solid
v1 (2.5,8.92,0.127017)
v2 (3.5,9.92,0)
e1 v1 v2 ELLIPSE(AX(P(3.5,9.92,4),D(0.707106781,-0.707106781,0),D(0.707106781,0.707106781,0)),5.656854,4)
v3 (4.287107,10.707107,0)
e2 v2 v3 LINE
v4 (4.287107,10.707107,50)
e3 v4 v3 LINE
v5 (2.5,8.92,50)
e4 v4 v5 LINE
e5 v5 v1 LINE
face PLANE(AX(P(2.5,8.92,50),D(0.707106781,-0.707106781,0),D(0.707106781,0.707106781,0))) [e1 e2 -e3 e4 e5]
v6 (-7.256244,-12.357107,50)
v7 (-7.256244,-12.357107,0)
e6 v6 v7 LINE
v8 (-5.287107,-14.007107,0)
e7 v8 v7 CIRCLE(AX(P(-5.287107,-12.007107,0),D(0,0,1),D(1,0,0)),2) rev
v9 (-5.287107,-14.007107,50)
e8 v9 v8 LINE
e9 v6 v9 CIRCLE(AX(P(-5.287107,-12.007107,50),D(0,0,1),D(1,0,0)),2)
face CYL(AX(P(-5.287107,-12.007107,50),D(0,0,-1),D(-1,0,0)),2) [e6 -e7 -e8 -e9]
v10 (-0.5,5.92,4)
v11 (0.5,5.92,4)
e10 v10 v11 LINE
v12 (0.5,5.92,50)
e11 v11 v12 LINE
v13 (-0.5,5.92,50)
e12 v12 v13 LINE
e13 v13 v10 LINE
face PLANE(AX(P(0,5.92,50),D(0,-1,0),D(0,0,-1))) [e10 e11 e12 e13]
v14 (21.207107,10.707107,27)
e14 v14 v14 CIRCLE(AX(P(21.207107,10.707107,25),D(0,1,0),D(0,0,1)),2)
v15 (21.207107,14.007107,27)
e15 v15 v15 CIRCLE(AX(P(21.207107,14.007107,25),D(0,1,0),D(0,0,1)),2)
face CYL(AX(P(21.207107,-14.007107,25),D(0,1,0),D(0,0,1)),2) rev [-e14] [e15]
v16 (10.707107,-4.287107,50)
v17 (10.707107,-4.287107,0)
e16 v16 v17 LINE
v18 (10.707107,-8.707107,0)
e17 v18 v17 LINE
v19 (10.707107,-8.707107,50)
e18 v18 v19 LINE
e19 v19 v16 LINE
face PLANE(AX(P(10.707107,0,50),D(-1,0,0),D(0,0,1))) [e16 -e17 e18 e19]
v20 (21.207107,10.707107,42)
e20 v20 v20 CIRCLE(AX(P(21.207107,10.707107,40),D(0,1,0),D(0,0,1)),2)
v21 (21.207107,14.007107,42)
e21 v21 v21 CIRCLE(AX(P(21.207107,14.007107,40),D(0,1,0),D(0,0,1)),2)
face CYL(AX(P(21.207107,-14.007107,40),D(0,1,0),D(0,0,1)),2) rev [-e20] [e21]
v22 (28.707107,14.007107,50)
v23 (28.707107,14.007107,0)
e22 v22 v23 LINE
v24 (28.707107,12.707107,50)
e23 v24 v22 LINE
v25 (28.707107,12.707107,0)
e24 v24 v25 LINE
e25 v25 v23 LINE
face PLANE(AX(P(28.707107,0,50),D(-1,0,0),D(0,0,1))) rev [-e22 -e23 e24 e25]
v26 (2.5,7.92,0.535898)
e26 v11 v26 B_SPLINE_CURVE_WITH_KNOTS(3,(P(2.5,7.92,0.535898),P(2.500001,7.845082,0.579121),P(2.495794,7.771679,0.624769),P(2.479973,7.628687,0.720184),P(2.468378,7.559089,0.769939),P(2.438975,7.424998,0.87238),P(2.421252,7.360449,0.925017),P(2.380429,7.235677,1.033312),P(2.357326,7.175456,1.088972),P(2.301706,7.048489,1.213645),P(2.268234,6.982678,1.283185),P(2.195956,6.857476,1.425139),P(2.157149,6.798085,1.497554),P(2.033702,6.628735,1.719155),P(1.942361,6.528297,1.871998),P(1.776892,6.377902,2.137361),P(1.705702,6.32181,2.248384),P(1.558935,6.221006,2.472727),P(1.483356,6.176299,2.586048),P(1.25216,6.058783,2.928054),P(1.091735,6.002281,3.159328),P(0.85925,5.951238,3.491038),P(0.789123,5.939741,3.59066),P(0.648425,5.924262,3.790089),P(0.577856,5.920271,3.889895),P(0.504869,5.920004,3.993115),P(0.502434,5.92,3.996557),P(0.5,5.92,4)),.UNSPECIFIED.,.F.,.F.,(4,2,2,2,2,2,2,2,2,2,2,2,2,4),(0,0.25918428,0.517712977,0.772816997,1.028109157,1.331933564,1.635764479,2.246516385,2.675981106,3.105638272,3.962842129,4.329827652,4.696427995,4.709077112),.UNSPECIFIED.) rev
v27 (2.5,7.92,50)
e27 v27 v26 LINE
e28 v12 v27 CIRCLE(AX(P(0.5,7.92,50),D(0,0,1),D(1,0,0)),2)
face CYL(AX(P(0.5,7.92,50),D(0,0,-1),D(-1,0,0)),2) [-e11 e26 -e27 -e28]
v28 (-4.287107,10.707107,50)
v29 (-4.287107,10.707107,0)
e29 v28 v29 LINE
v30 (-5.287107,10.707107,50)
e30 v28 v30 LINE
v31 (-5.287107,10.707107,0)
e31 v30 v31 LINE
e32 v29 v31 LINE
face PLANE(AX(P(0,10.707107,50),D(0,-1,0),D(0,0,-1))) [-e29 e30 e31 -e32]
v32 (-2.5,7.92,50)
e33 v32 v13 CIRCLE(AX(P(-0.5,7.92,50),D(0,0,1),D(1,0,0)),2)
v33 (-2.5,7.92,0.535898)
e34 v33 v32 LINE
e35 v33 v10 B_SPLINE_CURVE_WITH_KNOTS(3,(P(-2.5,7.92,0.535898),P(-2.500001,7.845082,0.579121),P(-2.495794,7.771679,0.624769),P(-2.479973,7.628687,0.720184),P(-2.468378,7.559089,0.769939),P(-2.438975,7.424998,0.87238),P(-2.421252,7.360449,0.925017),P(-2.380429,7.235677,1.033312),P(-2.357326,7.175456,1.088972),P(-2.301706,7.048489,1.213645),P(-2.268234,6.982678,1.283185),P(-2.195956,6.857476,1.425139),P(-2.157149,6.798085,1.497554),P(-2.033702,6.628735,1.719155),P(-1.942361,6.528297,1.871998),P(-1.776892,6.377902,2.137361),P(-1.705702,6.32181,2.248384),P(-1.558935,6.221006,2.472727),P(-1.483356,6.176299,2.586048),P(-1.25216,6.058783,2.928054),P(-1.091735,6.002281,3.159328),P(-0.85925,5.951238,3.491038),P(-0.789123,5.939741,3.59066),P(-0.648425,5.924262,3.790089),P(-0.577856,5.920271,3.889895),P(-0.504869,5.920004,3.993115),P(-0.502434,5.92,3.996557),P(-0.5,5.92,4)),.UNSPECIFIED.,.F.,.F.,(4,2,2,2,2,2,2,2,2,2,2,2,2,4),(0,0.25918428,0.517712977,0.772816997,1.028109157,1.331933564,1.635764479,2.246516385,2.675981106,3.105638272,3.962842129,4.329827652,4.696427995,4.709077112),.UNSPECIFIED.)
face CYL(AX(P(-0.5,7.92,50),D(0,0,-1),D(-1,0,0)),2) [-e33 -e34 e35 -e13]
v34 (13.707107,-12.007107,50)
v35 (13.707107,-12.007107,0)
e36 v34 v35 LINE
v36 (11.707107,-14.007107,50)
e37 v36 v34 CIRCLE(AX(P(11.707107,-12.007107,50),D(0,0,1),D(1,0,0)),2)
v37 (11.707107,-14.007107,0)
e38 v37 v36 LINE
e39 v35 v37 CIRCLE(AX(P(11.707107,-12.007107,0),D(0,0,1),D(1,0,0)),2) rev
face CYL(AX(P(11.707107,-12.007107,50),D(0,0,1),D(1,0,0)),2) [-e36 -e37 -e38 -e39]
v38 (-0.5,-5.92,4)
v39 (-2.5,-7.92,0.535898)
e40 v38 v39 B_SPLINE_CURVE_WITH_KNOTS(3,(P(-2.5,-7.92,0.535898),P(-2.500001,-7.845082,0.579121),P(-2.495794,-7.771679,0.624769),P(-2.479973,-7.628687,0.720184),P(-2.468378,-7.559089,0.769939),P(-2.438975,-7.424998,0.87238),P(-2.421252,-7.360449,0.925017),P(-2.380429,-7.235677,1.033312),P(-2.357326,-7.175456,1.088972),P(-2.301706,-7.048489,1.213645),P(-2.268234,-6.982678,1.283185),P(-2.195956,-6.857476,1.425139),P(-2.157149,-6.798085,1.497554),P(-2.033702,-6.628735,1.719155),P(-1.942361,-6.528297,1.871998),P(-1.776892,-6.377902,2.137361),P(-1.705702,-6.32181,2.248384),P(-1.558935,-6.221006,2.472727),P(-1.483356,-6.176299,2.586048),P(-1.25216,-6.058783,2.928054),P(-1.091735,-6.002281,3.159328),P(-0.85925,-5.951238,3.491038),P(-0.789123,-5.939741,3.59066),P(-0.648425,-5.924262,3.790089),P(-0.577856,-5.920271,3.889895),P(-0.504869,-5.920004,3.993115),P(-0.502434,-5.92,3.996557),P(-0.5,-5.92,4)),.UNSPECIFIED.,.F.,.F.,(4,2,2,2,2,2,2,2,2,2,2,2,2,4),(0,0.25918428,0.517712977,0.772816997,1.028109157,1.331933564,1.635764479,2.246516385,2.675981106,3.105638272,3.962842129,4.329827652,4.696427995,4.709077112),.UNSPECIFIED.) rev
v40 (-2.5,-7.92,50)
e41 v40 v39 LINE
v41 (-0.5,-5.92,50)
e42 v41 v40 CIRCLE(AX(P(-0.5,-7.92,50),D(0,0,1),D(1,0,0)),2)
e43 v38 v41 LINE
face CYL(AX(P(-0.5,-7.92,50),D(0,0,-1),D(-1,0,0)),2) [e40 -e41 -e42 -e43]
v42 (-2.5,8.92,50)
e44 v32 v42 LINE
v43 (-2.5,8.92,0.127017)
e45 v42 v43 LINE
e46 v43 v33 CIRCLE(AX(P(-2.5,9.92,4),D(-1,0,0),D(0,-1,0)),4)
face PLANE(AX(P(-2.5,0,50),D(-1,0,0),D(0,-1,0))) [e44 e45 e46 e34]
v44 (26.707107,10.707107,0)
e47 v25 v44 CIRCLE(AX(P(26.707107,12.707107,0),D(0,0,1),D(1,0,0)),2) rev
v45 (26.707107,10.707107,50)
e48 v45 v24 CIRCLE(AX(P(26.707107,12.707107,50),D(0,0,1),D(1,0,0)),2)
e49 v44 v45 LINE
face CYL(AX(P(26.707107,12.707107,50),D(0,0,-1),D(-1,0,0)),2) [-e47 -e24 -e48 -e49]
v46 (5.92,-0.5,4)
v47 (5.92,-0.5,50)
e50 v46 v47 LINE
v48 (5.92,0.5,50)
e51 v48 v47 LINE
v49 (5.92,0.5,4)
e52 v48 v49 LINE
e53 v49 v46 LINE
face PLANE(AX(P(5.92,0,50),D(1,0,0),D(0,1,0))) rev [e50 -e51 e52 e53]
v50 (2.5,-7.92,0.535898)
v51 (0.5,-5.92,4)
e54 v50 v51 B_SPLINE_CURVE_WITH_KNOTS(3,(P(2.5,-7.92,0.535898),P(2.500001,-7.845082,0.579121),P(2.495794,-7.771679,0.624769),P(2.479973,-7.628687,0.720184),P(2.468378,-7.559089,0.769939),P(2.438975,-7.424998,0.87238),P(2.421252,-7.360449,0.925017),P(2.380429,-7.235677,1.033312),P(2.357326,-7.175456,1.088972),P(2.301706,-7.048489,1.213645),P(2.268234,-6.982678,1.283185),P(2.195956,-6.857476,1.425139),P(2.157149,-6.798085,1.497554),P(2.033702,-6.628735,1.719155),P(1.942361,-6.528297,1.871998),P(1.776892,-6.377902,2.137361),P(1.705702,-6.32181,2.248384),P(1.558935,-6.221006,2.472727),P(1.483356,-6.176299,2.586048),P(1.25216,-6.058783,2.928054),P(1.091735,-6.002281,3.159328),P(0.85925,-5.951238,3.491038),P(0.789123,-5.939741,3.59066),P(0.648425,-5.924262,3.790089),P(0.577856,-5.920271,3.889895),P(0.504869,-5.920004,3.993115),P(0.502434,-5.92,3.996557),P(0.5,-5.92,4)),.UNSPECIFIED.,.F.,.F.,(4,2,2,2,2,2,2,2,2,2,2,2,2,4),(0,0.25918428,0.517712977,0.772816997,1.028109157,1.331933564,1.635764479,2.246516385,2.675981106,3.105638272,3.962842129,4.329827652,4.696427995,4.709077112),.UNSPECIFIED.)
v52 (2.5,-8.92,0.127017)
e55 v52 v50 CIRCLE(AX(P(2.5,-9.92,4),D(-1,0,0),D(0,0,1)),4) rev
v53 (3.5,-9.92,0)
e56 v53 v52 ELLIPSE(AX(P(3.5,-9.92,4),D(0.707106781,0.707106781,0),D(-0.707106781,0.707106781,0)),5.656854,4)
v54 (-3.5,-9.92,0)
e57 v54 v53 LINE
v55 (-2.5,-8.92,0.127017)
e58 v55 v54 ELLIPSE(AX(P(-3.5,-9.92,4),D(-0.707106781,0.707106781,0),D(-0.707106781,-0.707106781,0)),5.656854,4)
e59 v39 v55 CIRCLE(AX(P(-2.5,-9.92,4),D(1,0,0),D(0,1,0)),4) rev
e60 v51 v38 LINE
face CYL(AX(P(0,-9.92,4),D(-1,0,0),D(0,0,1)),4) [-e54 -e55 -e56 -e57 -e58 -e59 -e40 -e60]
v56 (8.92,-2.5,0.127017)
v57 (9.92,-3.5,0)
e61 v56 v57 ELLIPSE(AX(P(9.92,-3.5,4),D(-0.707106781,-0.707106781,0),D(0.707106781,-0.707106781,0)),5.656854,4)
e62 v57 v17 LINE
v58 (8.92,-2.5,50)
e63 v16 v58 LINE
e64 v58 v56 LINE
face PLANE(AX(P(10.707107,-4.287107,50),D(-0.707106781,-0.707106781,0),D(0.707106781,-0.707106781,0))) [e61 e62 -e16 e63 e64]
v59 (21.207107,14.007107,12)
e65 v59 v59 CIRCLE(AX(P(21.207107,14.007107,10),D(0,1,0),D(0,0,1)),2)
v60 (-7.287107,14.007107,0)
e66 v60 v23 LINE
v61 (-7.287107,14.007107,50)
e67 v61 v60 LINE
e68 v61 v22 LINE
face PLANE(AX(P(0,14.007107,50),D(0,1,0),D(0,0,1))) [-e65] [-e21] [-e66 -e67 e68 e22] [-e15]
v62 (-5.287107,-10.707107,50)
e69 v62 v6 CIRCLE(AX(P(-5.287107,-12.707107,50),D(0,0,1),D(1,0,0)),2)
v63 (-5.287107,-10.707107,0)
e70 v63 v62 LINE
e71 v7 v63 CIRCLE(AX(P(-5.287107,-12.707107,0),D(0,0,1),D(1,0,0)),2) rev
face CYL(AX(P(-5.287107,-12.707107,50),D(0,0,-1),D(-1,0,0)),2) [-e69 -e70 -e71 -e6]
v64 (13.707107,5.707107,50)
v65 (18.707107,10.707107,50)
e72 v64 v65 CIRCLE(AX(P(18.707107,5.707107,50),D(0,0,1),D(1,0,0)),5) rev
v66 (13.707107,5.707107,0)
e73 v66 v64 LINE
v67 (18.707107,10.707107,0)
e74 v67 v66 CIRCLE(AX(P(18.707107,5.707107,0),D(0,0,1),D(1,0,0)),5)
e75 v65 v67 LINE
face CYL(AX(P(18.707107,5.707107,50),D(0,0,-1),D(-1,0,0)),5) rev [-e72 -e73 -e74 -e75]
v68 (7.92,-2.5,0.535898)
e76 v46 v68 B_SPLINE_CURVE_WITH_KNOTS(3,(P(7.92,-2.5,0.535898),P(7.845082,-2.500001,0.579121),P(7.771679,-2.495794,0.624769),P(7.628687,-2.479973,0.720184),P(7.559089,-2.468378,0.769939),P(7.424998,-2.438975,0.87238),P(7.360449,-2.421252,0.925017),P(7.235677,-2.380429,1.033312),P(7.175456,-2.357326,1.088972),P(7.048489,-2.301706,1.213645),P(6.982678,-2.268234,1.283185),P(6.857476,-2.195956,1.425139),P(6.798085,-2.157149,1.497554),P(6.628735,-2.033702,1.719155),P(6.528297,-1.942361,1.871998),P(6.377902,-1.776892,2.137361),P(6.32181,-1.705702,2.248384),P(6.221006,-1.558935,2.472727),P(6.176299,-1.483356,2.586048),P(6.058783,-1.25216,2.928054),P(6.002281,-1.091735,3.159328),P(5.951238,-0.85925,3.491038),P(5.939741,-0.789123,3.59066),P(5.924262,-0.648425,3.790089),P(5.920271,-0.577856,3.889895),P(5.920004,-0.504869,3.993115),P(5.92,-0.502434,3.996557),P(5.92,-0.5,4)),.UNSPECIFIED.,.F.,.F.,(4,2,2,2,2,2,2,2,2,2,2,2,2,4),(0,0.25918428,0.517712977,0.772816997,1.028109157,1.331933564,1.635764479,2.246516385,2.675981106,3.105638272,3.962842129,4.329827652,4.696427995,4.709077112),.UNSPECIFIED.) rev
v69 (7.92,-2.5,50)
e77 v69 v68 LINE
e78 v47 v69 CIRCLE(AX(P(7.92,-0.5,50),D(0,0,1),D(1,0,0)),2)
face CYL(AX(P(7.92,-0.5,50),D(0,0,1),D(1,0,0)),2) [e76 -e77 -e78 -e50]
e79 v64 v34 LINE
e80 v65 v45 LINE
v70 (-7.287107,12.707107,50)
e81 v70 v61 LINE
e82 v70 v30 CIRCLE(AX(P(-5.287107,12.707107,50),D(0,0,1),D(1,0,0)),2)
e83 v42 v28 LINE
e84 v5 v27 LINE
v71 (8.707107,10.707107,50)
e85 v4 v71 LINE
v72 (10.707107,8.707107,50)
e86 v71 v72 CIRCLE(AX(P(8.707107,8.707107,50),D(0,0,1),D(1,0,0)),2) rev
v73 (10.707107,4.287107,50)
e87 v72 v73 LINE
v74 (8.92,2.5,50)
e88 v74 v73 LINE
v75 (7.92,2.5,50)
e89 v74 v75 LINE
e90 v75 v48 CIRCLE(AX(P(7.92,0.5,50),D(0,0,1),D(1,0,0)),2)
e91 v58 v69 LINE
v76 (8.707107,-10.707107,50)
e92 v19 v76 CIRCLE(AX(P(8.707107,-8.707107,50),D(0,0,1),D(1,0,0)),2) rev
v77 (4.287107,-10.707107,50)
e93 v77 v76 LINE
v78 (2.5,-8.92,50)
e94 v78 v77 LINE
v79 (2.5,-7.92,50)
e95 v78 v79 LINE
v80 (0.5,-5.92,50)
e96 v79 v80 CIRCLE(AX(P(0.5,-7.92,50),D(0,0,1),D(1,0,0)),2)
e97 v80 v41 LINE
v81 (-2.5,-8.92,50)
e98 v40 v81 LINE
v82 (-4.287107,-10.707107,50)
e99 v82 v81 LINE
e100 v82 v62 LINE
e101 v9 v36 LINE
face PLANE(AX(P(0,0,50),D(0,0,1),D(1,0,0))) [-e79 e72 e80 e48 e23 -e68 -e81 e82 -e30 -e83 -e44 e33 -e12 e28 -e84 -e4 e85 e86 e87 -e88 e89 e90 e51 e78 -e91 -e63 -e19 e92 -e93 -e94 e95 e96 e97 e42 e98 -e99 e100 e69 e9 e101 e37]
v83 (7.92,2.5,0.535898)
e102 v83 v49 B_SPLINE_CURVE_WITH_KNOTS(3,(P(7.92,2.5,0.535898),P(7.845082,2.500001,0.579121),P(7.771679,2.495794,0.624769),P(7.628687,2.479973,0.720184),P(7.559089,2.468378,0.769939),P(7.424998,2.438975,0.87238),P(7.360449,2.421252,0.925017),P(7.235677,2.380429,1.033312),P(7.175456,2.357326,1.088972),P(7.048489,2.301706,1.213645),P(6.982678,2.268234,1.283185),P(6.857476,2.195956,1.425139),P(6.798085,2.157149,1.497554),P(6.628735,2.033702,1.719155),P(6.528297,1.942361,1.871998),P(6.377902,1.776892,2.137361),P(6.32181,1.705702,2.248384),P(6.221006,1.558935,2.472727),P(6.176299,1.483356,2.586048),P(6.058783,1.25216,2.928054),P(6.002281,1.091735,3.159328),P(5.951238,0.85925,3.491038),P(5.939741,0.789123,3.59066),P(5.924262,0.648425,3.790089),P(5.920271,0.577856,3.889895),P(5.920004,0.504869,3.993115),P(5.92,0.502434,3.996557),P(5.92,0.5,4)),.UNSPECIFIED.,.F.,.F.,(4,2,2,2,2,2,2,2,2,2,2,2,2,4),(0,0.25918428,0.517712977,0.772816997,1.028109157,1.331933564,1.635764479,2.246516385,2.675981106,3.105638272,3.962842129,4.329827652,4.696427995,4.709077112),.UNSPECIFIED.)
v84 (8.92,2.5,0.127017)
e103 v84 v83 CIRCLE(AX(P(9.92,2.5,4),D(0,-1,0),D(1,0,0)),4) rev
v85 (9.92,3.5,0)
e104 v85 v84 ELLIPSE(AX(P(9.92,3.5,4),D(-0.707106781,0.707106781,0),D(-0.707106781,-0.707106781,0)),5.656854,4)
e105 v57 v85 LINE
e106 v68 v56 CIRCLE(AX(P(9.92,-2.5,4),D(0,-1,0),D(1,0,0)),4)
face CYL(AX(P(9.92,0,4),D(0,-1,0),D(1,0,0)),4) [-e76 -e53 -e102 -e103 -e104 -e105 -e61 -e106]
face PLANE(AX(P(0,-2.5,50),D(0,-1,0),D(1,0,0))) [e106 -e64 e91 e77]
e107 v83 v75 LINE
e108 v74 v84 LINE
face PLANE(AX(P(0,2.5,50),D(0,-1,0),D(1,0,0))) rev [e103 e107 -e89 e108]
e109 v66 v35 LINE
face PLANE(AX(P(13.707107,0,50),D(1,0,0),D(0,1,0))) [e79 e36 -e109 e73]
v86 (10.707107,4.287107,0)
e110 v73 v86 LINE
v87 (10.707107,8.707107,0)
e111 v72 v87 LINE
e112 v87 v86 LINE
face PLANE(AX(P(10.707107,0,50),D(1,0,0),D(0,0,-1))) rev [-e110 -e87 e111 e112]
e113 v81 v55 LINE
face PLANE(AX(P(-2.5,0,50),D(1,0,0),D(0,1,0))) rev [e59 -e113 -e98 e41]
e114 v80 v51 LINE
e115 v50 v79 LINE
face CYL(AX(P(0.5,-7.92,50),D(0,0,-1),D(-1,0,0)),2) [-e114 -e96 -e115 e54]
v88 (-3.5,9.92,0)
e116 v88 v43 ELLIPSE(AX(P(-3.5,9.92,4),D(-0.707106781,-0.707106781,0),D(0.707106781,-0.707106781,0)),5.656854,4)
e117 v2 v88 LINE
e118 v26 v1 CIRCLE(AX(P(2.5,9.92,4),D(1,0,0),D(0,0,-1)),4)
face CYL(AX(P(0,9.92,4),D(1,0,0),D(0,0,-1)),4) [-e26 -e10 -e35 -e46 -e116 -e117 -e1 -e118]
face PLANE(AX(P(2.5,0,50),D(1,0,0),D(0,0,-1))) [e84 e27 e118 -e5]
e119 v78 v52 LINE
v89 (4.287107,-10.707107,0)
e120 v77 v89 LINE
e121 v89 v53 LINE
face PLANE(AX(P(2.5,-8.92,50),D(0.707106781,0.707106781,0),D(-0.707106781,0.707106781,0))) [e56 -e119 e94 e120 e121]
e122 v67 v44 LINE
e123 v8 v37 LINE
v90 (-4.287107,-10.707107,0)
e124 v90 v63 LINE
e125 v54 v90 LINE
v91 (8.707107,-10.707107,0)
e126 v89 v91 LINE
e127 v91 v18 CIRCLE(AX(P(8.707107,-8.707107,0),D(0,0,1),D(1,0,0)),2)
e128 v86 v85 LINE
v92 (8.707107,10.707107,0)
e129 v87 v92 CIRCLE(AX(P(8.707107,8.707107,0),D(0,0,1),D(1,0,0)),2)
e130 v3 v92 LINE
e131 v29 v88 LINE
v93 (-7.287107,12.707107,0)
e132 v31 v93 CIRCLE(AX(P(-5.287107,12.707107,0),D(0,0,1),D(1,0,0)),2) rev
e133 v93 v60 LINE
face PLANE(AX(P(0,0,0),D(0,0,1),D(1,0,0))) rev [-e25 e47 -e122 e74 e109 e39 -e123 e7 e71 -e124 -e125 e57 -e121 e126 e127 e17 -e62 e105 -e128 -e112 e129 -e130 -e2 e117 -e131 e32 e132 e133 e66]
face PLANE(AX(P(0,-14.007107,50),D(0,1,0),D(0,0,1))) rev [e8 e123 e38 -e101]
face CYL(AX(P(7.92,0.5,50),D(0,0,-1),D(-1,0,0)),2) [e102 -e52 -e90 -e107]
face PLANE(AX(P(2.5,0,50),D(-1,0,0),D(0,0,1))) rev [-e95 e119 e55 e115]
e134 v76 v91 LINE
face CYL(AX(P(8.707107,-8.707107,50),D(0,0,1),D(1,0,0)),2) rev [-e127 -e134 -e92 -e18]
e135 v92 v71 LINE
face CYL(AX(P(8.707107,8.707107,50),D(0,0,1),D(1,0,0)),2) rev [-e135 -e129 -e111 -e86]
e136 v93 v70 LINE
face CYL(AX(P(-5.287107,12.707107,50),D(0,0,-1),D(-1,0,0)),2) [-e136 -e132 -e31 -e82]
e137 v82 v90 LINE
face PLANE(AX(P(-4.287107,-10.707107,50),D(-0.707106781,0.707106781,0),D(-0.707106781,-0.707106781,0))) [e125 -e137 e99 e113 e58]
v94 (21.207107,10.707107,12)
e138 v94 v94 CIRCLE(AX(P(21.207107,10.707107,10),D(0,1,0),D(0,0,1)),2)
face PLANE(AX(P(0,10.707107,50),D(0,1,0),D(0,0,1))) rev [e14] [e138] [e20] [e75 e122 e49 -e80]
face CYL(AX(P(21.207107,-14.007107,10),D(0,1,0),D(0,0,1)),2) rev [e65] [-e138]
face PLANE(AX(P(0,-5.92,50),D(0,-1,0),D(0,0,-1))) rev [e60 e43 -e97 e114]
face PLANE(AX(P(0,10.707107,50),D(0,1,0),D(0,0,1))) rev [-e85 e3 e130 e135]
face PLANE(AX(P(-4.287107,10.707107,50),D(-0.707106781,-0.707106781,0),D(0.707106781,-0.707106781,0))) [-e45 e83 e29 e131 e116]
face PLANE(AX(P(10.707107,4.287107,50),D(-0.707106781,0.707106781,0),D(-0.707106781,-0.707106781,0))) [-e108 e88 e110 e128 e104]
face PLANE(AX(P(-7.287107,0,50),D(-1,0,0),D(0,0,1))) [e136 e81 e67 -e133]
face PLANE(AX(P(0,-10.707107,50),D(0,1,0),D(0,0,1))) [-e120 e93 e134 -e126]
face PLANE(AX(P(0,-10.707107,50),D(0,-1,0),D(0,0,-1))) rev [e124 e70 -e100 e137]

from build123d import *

# Parameters (mm, degrees)
BOSS_EXTRUDE1_DEPTH     = 50
CUT_EXTRUDE1_DEPTH      = 60.332090981
SKETCH3_W               = 15
SKETCH3_H               = 3.3
CUT_EXTRUDE2_DEPTH      = 60.332090981
CUT_EXTRUDE4_DEPTH      = 60.332090981
CUT_EXTRUDE4_DEPTH_BACK = 10
FILLET1_R               = 2
FILLET2_R               = 5
CUT_EXTRUDE5_DEPTH      = 60.332090981
CUT_EXTRUDE5_DEPTH_BACK = 60.332090981
SKETCH7_R               = 2
FILLET3_R               = 4


with BuildPart() as part:
    # Sketch1 → Boss-Extrude1 (new body)
    with BuildSketch(Plane.XY):
        Polygon((2.5, 7.92), (4.58, 10), (5.287106781, 10.707106781), (10.707106781, 10.707106781), (10.707106781, 5.287106781), (10, 4.58), (7.92, 2.5), (5.92, 2.5), (5.92, -2.5), (7.92, -2.5), (10, -4.58), (10.707106781, -5.287106781), (10.707106781, -7.287106781), (13.707106781, -7.287106781), (13.707106781, 10.707106781), (28.707106781, 10.707106781), (28.707106781, 14.007106781), (13.707106781, 14.007106781), (-7.287106781, 14.007106781), (-7.287106781, 10.707106781), (-5.287106781, 10.707106781), (-4.58, 10), (-2.5, 7.92), (-2.5, 5.92), (2.5, 5.92), align=None)
    boss_extrude1 = extrude(amount=BOSS_EXTRUDE1_DEPTH)

    # Sketch2 → Cut-Extrude1 (cut, through all)
    with BuildSketch(Plane.XY):
        Polygon((0, 0), (18.478629357, 0), (18.478629357, -9.938314006), (0, -9.42769987), align=None)
    extrude(amount=CUT_EXTRUDE1_DEPTH, mode=Mode.SUBTRACT)

    # Mirror1: Boss-Extrude1 across plane
    add(boss_extrude1.mirror(Plane.ZX))

    # Sketch3 → Cut-Extrude2 (cut, through all)
    with BuildSketch(Plane.XY):
        with Locations((21.207106781, -12.357106781)):
            Rectangle(SKETCH3_W, SKETCH3_H)
    extrude(amount=CUT_EXTRUDE2_DEPTH, mode=Mode.SUBTRACT)

    # Sketch6 → Cut-Extrude4 (cut, two sides: drawn at the far end of the back side and taken through both)
    with BuildSketch(Plane.XY.offset(-CUT_EXTRUDE4_DEPTH_BACK)):
        Polygon((-5.287106781, 10.707106781), (-4.287106781, 10.707106781), (-2.5, 8.92), (-2.5, 7.92), align=None)
        Polygon((2.5, 7.92), (2.5, 8.92), (4.287106781, 10.707106781), (5.287106781, 10.707106781), align=None)
        Polygon((7.92, 2.5), (8.92, 2.5), (10.707106781, 4.287106781), (10.707106781, 5.287106781), align=None)
        Polygon((7.92, -2.5), (10.707106781, -5.287106781), (10.707106781, -4.287106781), (8.92, -2.5), align=None)
        Polygon((2.5, -7.92), (5.287106781, -10.707106781), (4.287106781, -10.707106781), (2.5, -8.92), align=None)
        Polygon((-5.287106781, -10.707106781), (-2.5, -7.92), (-2.5, -8.92), (-4.287106781, -10.707106781), align=None)
    extrude(amount=CUT_EXTRUDE4_DEPTH + CUT_EXTRUDE4_DEPTH_BACK, mode=Mode.SUBTRACT)

    # Fillet1
    # the kernel refuses this fillet: 2 mm, written as the material it adds along each edge
    with BuildSketch(Plane(origin=(10.707106781, 10.707106781, 0), x_dir=(0, -1, 0), z_dir=(0, 0, 1)), Plane(origin=(10.707106781, -10.707106781, 0), x_dir=(-1, 0, 0), z_dir=(0, 0, 1))) as fillet1_piece_1:
        with BuildLine():
            CenterArc((FILLET1_R, -FILLET1_R), FILLET1_R, 90, 90)
            Line((0, -FILLET1_R), (0, 0))
            Line((0, 0), (FILLET1_R, 0))
        make_face()
    extrude(amount=50)
    # the kernel refuses this fillet: 2 mm, written as the material it takes off along each edge
    with BuildSketch(Plane(origin=(13.707106781, -14.007106781, -5), x_dir=(-1, 0, 0), z_dir=(0, 0, 1)), Plane(origin=(5.92, 2.5, -5), x_dir=(1, 0, 0), z_dir=(0, 0, 1)), Plane(origin=(2.5, 5.92, -5), x_dir=(-1, 0, 0), z_dir=(0, 0, 1)), Plane(origin=(-2.5, 5.92, -5), x_dir=(0, 1, 0), z_dir=(0, 0, 1)), Plane(origin=(-7.287106781, 10.707106781, -5), x_dir=(0, 1, 0), z_dir=(0, 0, 1)), Plane(origin=(28.707106781, 10.707106781, -5), x_dir=(-1, 0, 0), z_dir=(0, 0, 1)), Plane(origin=(5.92, -2.5, -5), x_dir=(0, 1, 0), z_dir=(0, 0, 1)), Plane(origin=(2.5, -5.92, -5), x_dir=(0, -1, 0), z_dir=(0, 0, 1)), Plane(origin=(-2.5, -5.92, -5), x_dir=(1, 0, 0), z_dir=(0, 0, 1)), Plane(origin=(-7.287106781, -10.707106781, -5), x_dir=(1, 0, 0), z_dir=(0, 0, 1)), Plane(origin=(-7.287106781, -14.007106781, -5), x_dir=(0, 1, 0), z_dir=(0, 0, 1))) as fillet1_2_piece_1:
        with BuildLine():
            CenterArc((FILLET1_R, -FILLET1_R), FILLET1_R, 90, 90)
            Line((0, -FILLET1_R), (0, 0))
            Line((0, 0), (FILLET1_R, 0))
        make_face()
    extrude(amount=60, mode=Mode.SUBTRACT)

    # Fillet2
    fillet2_edges = [part.edges().sort_by_distance(p)[0] for p in [
        (13.707106781, 10.707106781, 25),
    ]]
    fillet(fillet2_edges, radius=FILLET2_R)

    # Sketch7 → Cut-Extrude5 (cut, two sides: drawn at the far end of the back side and taken through both)
    with BuildSketch(Plane(origin=(0, 0, 0), x_dir=(1, 0, 0), z_dir=(0, 1, 0)).offset(-CUT_EXTRUDE5_DEPTH_BACK)):
        with Locations(Location((21.207106781, -40, 0), (0, 0, 270))):
            Circle(SKETCH7_R)
        with Locations(Location((21.207106781, -25, 0), (0, 0, 270))):
            Circle(SKETCH7_R)
        with Locations(Location((21.207106781, -10, 0), (0, 0, 270))):
            Circle(SKETCH7_R)
    extrude(amount=CUT_EXTRUDE5_DEPTH + CUT_EXTRUDE5_DEPTH_BACK, mode=Mode.SUBTRACT)

    # Fillet3
    # the kernel refuses this fillet: 4 mm, written as the material it takes off along each edge
    with BuildSketch(Plane(origin=(-10.5, -5.92, 0), x_dir=(0, -1, 0), z_dir=(1, 0, 0))) as fillet3_piece_1_section:
        with BuildLine():
            CenterArc((FILLET3_R, -FILLET3_R), FILLET3_R, 90, 90)
            Line((0, -FILLET3_R), (0, 0))
            Line((0, 0), (FILLET3_R, 0))
        make_face()
    fillet3_piece_1 = extrude(amount=21, mode=Mode.PRIVATE)
    fillet3_piece_1 = split(fillet3_piece_1, bisect_by=Plane(origin=(2.5, -6.766631822, 0.880672942), z_dir=(-1, 0, 0)), keep=Keep.TOP, mode=Mode.PRIVATE)
    add(fillet3_piece_1, mode=Mode.SUBTRACT)
    with BuildSketch(Plane(origin=(-10.5, -5.92, 0), x_dir=(0, -1, 0), z_dir=(1, 0, 0))) as fillet3_piece_2_section:
        with BuildLine():
            CenterArc((FILLET3_R, -FILLET3_R), FILLET3_R, 90, 90)
            Line((0, -FILLET3_R), (0, 0))
            Line((0, 0), (FILLET3_R, 0))
        make_face()
    fillet3_piece_2 = extrude(amount=21, mode=Mode.PRIVATE)
    fillet3_piece_2 = split(fillet3_piece_2, bisect_by=Plane(origin=(2.799453379, -9.219453379, 0.025268376), z_dir=(-0.7071067811865467, -0.7071067811865485, 0)), keep=Keep.TOP, mode=Mode.PRIVATE)
    add(fillet3_piece_2, mode=Mode.SUBTRACT)
    with BuildSketch(Plane(origin=(5.92, -10.5, 0), x_dir=(1, 0, 0), z_dir=(0, 1, 0))) as fillet3_piece_3_section:
        with BuildLine():
            CenterArc((FILLET3_R, -FILLET3_R), FILLET3_R, 90, 90)
            Line((0, -FILLET3_R), (0, 0))
            Line((0, 0), (FILLET3_R, 0))
        make_face()
    fillet3_piece_3 = extrude(amount=21, mode=Mode.PRIVATE)
    fillet3_piece_3 = split(fillet3_piece_3, bisect_by=Plane(origin=(6.766631909, -2.5, 0.880672877), z_dir=(0, 1, 0)), keep=Keep.TOP, mode=Mode.PRIVATE)
    fillet3_piece_3 = split(fillet3_piece_3, bisect_by=Plane(origin=(6.766631909, 2.5, 0.880672877), z_dir=(0, -1, 0)), keep=Keep.TOP, mode=Mode.PRIVATE)
    add(fillet3_piece_3, mode=Mode.SUBTRACT)
    with BuildSketch(Plane(origin=(5.92, -10.5, 0), x_dir=(1, 0, 0), z_dir=(0, 1, 0))) as fillet3_piece_4_section:
        with BuildLine():
            CenterArc((FILLET3_R, -FILLET3_R), FILLET3_R, 90, 90)
            Line((0, -FILLET3_R), (0, 0))
            Line((0, 0), (FILLET3_R, 0))
        make_face()
    fillet3_piece_4 = extrude(amount=21, mode=Mode.PRIVATE)
    fillet3_piece_4 = split(fillet3_piece_4, bisect_by=Plane(origin=(9.219453379, -2.799453379, 0.025268376), z_dir=(0.7071067811865552, 0.7071067811865398, 0)), keep=Keep.TOP, mode=Mode.PRIVATE)
    fillet3_piece_4 = split(fillet3_piece_4, bisect_by=Plane(origin=(6.519817793, 0.099817793, 0.025268376), z_dir=(0.7071067811865552, -0.7071067811865398, 0)), keep=Keep.TOP, mode=Mode.PRIVATE)
    add(fillet3_piece_4, mode=Mode.SUBTRACT)
    with BuildSketch(Plane(origin=(-10.5, 5.92, 0), x_dir=(0, 1, 0), z_dir=(1, 0, 0))) as fillet3_piece_5_section:
        with BuildLine():
            CenterArc((FILLET3_R, FILLET3_R), FILLET3_R, 180, 90)
            Line((0, FILLET3_R), (0, 0))
            Line((0, 0), (FILLET3_R, 0))
        make_face()
    fillet3_piece_5 = extrude(amount=21, mode=Mode.PRIVATE)
    fillet3_piece_5 = split(fillet3_piece_5, bisect_by=Plane(origin=(2.5, 6.766633177, 0.880671903), z_dir=(-1, 0, 0)), keep=Keep.TOP, mode=Mode.PRIVATE)
    add(fillet3_piece_5, mode=Mode.SUBTRACT)
    with BuildSketch(Plane(origin=(-10.5, 5.92, 0), x_dir=(0, 1, 0), z_dir=(1, 0, 0))) as fillet3_piece_6_section:
        with BuildLine():
            CenterArc((FILLET3_R, FILLET3_R), FILLET3_R, 180, 90)
            Line((0, FILLET3_R), (0, 0))
            Line((0, 0), (FILLET3_R, 0))
        make_face()
    fillet3_piece_6 = extrude(amount=21, mode=Mode.PRIVATE)
    fillet3_piece_6 = split(fillet3_piece_6, bisect_by=Plane(origin=(2.799453379, 9.219453379, 0.025268376), z_dir=(-0.7071067811865467, 0.7071067811865485, 0)), keep=Keep.TOP, mode=Mode.PRIVATE)
    add(fillet3_piece_6, mode=Mode.SUBTRACT)


solid = part.part
